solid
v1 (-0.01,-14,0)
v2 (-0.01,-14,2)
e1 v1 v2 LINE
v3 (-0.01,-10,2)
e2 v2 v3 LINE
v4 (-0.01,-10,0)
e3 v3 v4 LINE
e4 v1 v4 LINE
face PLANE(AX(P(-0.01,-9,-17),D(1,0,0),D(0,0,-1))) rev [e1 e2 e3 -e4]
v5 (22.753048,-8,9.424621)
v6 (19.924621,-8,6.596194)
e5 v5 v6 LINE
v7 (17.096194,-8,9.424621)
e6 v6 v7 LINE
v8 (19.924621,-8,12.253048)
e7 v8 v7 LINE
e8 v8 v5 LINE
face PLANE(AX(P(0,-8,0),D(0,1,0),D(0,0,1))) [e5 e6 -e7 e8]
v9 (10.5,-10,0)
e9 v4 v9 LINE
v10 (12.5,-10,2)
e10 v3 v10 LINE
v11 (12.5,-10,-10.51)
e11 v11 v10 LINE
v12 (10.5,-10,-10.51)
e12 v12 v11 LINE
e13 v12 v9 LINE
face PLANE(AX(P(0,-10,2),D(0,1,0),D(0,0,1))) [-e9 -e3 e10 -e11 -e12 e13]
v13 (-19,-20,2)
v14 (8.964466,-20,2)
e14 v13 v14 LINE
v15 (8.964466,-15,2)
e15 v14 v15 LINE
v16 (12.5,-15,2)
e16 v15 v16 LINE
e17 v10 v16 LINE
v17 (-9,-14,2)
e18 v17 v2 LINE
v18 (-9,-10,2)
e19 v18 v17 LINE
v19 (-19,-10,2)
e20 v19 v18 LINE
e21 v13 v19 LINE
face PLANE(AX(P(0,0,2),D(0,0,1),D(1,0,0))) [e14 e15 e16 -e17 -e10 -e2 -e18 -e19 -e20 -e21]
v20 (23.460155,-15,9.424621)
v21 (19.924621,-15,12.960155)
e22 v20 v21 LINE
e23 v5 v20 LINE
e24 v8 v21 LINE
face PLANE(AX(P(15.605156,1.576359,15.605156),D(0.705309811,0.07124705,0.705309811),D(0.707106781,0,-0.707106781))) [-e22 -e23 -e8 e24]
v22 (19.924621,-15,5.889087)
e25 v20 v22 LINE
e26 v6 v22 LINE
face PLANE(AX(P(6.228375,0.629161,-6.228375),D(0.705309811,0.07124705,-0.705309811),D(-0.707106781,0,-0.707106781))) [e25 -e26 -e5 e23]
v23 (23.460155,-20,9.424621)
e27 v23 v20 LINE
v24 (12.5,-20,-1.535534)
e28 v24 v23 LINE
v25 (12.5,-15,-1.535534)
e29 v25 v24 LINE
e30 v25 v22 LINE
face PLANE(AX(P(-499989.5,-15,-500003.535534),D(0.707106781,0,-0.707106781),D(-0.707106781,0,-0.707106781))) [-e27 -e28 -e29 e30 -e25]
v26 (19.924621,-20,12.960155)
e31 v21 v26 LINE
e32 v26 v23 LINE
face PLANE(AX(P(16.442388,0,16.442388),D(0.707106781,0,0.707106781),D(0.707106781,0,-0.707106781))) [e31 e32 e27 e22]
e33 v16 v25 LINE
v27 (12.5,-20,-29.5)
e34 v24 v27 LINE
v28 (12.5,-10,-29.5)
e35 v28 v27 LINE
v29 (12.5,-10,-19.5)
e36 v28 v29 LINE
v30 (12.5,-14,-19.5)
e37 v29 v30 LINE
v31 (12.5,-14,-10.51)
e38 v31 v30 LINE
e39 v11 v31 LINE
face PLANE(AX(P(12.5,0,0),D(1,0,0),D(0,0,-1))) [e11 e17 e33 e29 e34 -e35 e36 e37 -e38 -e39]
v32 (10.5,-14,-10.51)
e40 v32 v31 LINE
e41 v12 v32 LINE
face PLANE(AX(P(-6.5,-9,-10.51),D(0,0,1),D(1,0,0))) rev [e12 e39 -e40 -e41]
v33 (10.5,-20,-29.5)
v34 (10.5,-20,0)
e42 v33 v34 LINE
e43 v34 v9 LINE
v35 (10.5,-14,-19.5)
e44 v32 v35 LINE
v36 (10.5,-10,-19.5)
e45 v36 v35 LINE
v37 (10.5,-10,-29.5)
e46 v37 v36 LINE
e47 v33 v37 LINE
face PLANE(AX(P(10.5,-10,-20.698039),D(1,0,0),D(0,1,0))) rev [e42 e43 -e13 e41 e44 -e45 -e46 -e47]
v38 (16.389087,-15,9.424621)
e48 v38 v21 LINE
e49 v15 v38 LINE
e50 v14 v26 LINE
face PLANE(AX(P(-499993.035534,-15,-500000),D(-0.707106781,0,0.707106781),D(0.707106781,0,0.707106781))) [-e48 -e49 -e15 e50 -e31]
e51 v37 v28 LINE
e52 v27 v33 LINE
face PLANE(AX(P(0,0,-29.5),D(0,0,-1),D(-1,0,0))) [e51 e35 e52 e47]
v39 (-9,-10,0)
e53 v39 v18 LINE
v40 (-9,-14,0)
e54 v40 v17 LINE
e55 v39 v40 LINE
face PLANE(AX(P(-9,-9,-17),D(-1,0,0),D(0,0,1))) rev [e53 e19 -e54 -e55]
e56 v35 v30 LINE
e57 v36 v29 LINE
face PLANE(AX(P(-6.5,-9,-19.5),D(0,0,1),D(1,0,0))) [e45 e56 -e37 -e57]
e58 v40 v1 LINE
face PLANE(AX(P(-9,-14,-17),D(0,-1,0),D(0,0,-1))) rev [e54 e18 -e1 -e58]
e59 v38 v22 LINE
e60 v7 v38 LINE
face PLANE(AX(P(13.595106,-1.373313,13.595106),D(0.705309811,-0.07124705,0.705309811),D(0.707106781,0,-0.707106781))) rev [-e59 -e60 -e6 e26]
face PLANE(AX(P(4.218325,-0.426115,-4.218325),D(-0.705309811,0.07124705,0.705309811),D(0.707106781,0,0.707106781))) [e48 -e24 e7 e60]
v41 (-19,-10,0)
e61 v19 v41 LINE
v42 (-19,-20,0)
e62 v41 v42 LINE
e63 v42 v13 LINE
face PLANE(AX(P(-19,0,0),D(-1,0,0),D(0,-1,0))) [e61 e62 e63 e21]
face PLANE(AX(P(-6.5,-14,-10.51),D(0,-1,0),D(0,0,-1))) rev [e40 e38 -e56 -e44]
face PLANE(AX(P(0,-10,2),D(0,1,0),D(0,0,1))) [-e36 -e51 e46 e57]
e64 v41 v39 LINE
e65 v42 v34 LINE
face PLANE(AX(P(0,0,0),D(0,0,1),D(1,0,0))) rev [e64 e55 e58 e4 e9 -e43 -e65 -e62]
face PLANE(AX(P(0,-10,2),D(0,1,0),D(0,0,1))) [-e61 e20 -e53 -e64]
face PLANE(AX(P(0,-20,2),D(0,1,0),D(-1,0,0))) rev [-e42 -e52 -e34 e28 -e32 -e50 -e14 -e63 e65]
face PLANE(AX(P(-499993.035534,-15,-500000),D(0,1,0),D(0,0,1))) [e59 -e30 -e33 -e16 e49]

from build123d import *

# Parameters (mm, degrees)
SKETCH2_W           = 10.5
SKETCH2_H           = 10
BOSS_EXTRUDE1_DEPTH = 2
SKETCH3_W           = 2
SKETCH3_H           = 10
BOSS_EXTRUDE2_DEPTH = 2
SKETCH4_W           = 2
SKETCH4_H           = 10
BOSS_EXTRUDE3_DEPTH = 10.5
SKETCH18_W          = 2
SKETCH18_H          = 10
BOSS_EXTRUDE6_DEPTH = 19
SKETCH19_W          = 8.99
SKETCH19_H          = 5
CUT_EXTRUDE1_DEPTH  = 19
SKETCH20_W          = 2
SKETCH20_H          = 10
BOSS_EXTRUDE7_DEPTH = 19
SKETCH21_W          = 8.99
SKETCH21_H          = 5
CUT_EXTRUDE2_DEPTH  = 19
BOSS_EXTRUDE8_REACH = 54.114
SKETCH22_W          = 5
SKETCH22_H          = 5
SKETCH23_W          = 5
SKETCH23_H          = 5
BOSS_EXTRUDE9_DEPTH = 10
LOFT1_DEPTH         = 7
LOFT1_DRAFT         = 4.0856168


# Read off the part's stored shape, not the designer's step: Loft1
with BuildPart() as part:
    # Sketch2 → Boss-Extrude1 (new body)
    with BuildSketch(Plane.XY):
        with Locations((5.25, -15)):
            Rectangle(SKETCH2_W, SKETCH2_H)
    extrude(amount=BOSS_EXTRUDE1_DEPTH)

    # Sketch3 → Boss-Extrude2 (add)
    with BuildSketch(Plane(origin=(10.5, 0, 0), x_dir=(0, 0, -1), z_dir=(1, 0, 0))):
        with Locations((-1, -15)):
            Rectangle(SKETCH3_W, SKETCH3_H)
    extrude(amount=BOSS_EXTRUDE2_DEPTH)

    # Sketch4 → Boss-Extrude3 (add)
    with BuildSketch(Plane(origin=(0, 0, 0), x_dir=(-1, 0, 0), z_dir=(0, 0, -1))):
        with Locations((-11.5, -15)):
            Rectangle(SKETCH4_W, SKETCH4_H)
    extrude(amount=BOSS_EXTRUDE3_DEPTH)

    # Sketch18 → Boss-Extrude6 (add)
    with BuildSketch(Plane(origin=(0, 0, -10.5), x_dir=(-1, 0, 0), z_dir=(0, 0, -1))):
        with Locations((-11.5, -15)):
            Rectangle(SKETCH18_W, SKETCH18_H)
    extrude(amount=BOSS_EXTRUDE6_DEPTH)

    # Sketch19 → Cut-Extrude1 (cut)
    with BuildSketch(Plane(origin=(12.5, 0, 0), x_dir=(0, 0, -1), z_dir=(1, 0, 0))):
        with Locations((15.005, -11.5)):
            Rectangle(SKETCH19_W, SKETCH19_H)
    extrude(amount=-CUT_EXTRUDE1_DEPTH, mode=Mode.SUBTRACT)

    # Sketch20 → Boss-Extrude7 (add)
    with BuildSketch(Plane.ZY):
        with Locations((1, -15)):
            Rectangle(SKETCH20_W, SKETCH20_H)
    extrude(amount=BOSS_EXTRUDE7_DEPTH)

    # Sketch21 → Cut-Extrude2 (cut)
    with BuildSketch(Plane.XY.offset(2)):
        with Locations((-4.505, -11.5)):
            Rectangle(SKETCH21_W, SKETCH21_H)
    extrude(amount=-CUT_EXTRUDE2_DEPTH, mode=Mode.SUBTRACT)

    # Sketch22 → Boss-Extrude8 (add, up to next)
    with BuildSketch(Plane(origin=(9.371320344, 0, 9.371320344), x_dir=(0.7071067811865476, 0, -0.7071067811865476), z_dir=(0.7071067811865476, 0, 0.7071067811865476)), mode=Mode.PRIVATE) as boss_extrude8_sk1:
        with Locations((7.424621202, -17.5)):
            Rectangle(SKETCH22_W, SKETCH22_H)
    boss_extrude8_tool1 = extrude(boss_extrude8_sk1.sketch, amount=-BOSS_EXTRUDE8_REACH, mode=Mode.PRIVATE) - part.part
    add(boss_extrude8_tool1.solids().sort_by_distance((14.62132, -17.5, 4.12132))[0])

    # Sketch23 → Boss-Extrude9 (add)
    with BuildSketch(Plane(origin=(9.371320344, 0, 9.371320344), x_dir=(0.7071067811865475, 0, -0.7071067811865476), z_dir=(0.7071067811865476, 0, 0.7071067811865475))):
        with Locations((7.424621202, -17.5)):
            Rectangle(SKETCH23_W, SKETCH23_H)
    extrude(amount=BOSS_EXTRUDE9_DEPTH)


with BuildPart() as loft1_tool:
    # Loft1 outline → Loft1 (with draft: the straight prism first)
    with BuildSketch(Plane(origin=(0, -8, 0), x_dir=(1, 0, 0), z_dir=(0, 1, 0))):
        Polygon((17.096194078, -9.424621202), (19.924621202, -12.253048327), (22.753048327, -9.424621202), (19.924621202, -6.596194078), align=None)
    extrude(amount=-LOFT1_DEPTH)
    # Loft1: the draft: its side faces are tilted about the plane it starts from
    loft1_sides = [loft1_tool.faces().sort_by_distance(p)[0] for p in [
        (18.51040764, -11.5, 10.838834765),
        (21.338834764, -11.5, 10.838834764),
        (21.338834764, -11.5, 8.01040764),
        (18.51040764, -11.5, 8.01040764),
    ]]
    draft(loft1_sides, Plane(origin=(0, -8, 0), x_dir=(1, 0, 0), z_dir=(0, 1, 0)), LOFT1_DRAFT)


with BuildPart() as part_1:
    add(part.part)

    # Loft1: add loft1_tool
    add(loft1_tool.part)


solid = part_1.part
